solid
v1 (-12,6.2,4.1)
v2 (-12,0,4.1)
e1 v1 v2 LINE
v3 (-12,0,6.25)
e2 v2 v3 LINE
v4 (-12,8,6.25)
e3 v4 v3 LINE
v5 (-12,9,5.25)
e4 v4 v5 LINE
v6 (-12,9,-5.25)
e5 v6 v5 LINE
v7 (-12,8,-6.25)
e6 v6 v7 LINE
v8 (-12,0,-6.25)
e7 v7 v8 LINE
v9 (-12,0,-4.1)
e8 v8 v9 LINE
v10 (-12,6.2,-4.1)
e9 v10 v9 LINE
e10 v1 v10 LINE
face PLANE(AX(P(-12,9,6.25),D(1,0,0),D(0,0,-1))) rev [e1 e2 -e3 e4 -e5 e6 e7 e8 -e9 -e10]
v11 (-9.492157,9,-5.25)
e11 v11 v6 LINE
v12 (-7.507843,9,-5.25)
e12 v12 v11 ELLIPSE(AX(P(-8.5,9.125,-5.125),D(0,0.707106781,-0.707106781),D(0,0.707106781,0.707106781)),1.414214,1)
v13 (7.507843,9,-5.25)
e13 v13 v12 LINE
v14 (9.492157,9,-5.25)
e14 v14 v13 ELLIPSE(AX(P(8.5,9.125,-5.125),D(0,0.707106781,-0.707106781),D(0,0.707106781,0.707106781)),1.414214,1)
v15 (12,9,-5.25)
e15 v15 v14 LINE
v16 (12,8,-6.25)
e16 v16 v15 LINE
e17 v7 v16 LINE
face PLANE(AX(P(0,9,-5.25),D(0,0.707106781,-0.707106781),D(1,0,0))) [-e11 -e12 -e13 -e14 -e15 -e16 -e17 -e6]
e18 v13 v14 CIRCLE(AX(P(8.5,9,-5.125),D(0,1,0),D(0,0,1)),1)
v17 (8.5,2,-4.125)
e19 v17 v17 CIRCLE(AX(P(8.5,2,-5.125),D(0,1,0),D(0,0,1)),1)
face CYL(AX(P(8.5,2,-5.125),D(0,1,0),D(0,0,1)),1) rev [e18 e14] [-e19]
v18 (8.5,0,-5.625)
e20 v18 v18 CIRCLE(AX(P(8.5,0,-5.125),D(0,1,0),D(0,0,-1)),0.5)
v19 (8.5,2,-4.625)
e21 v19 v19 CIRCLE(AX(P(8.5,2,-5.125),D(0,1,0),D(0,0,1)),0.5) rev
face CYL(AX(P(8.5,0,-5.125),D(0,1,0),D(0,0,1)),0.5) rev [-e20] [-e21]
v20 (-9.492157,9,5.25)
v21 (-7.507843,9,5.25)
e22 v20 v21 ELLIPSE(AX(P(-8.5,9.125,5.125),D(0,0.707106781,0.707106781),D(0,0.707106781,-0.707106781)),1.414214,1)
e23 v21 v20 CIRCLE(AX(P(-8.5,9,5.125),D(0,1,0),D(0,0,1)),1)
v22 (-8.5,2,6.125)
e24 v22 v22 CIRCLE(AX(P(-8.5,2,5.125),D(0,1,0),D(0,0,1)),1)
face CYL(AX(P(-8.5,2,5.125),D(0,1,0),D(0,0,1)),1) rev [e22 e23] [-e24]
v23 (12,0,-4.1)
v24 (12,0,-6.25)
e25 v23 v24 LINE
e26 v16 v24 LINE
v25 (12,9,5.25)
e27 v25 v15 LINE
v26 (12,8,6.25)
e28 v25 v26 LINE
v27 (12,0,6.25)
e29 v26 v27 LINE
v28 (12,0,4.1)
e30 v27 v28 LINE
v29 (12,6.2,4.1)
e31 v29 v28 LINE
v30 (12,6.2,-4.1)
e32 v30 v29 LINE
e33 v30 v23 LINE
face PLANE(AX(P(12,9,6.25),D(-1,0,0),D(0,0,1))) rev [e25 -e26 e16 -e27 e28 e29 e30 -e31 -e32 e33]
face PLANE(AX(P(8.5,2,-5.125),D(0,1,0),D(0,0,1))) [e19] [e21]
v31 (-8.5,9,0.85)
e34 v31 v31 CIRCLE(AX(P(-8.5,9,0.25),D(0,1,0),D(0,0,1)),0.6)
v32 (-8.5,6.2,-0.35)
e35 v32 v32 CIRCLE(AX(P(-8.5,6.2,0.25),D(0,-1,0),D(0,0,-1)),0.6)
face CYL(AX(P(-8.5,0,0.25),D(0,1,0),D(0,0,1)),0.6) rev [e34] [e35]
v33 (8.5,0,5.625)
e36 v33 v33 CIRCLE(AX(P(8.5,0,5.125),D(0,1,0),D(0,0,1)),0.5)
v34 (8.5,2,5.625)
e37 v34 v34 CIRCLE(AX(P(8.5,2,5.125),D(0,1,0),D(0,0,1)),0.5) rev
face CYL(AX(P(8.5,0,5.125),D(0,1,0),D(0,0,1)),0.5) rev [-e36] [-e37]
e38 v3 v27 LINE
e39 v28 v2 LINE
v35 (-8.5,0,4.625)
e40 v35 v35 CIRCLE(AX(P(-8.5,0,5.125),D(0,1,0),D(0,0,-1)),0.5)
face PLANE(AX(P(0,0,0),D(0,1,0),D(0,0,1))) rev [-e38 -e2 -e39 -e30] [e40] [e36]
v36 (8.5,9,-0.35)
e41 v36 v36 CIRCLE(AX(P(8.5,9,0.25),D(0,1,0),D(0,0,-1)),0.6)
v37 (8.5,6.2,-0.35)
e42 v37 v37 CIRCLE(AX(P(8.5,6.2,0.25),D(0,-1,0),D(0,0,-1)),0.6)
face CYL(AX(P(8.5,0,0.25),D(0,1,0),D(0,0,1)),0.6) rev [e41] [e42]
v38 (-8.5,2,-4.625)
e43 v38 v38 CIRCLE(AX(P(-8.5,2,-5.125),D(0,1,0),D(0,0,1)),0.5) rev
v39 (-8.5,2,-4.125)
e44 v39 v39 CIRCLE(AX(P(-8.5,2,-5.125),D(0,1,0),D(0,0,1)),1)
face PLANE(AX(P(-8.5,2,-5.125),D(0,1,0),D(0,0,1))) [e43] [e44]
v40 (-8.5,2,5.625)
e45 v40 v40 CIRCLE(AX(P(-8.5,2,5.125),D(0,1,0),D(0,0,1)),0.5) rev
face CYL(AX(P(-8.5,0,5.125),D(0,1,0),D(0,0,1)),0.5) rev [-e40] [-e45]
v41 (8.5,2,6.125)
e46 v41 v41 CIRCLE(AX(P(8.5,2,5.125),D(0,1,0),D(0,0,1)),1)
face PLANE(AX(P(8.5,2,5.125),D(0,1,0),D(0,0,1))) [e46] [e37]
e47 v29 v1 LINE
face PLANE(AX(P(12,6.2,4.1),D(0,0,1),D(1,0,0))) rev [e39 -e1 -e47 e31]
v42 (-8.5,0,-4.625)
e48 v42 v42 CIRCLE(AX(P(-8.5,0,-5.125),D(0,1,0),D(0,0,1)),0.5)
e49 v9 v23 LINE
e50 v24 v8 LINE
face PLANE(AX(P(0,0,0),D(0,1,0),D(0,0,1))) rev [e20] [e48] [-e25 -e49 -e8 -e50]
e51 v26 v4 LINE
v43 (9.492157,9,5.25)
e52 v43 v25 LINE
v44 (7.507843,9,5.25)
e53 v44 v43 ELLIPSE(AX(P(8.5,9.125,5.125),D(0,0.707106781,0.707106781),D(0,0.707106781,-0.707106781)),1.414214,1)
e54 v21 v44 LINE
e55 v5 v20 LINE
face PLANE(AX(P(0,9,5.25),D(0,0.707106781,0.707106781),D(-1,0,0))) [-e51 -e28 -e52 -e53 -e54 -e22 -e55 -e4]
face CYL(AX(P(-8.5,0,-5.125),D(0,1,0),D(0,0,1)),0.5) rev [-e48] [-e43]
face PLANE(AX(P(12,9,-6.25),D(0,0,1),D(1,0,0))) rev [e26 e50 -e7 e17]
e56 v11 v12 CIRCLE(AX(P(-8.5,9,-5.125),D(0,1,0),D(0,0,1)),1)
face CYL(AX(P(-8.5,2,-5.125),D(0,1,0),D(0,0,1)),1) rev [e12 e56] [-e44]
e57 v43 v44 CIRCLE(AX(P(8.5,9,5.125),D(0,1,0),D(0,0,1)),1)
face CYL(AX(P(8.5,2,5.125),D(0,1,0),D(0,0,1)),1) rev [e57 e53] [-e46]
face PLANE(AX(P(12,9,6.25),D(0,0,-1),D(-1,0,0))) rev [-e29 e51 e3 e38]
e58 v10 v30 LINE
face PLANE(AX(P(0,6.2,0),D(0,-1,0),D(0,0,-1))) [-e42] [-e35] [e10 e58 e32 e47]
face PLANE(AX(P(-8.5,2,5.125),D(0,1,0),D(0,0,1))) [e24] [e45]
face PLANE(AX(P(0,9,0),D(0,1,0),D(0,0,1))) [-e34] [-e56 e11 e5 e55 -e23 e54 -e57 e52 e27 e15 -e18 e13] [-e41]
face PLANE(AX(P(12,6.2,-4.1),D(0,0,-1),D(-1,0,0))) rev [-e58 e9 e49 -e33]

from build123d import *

# Parameters (mm, degrees)
SKETCH_1_W          = 24
SKETCH_1_H          = 12.5
EXTRUDE_1_DEPTH     = 9
SKETCH_2_W          = 24
SKETCH_2_H          = 8.2
CUT_EXTRUDE_1_DEPTH = 6.2
SKETCH_3_R          = 0.5
CUT_EXTRUDE_2_DEPTH = 17.25
SKETCH_4_R          = 0.6
CUT_EXTRUDE_3_DEPTH = 17.25
SKETCH_5_R          = 1
CUT_EXTRUDE_4_DEPTH = 7
CHAMFER_1_SIZE      = 1


with BuildPart() as part:
    # 草图1 → 凸台-拉伸1 (new body)
    with BuildSketch(Plane(origin=(0, 0, 0), x_dir=(1, 0, 0), z_dir=(0, 1, 0))):
        Rectangle(SKETCH_1_W, SKETCH_1_H)
    extrude(amount=EXTRUDE_1_DEPTH)

    # 草图2 → 切除-拉伸1 (cut)
    with BuildSketch(Plane.XZ):
        Rectangle(SKETCH_2_W, SKETCH_2_H)
    extrude(amount=-CUT_EXTRUDE_1_DEPTH, mode=Mode.SUBTRACT)

    # 草图3 → 切除-拉伸2 (cut, through all)
    with BuildSketch(Plane(origin=(0, 9, 0), x_dir=(1, 0, 0), z_dir=(0, 1, 0))):
        with Locations(Location((-8.5, 5.125, 0), (0, 0, 270))):
            Circle(SKETCH_3_R)
        with Locations(Location((8.5, 5.125, 0), (0, 0, 90))):
            Circle(SKETCH_3_R)
        with Locations(Location((8.5, -5.125, 0), (0, 0, 270))):
            Circle(SKETCH_3_R)
        with Locations(Location((-8.5, -5.125, 0), (0, 0, 90))):
            Circle(SKETCH_3_R)
    extrude(amount=-CUT_EXTRUDE_2_DEPTH, mode=Mode.SUBTRACT)

    # 草图4 → 切除-拉伸3 (cut, through all)
    with BuildSketch(Plane(origin=(0, 9, 0), x_dir=(1, 0, 0), z_dir=(0, 1, 0))):
        with Locations(Location((-8.5, -0.25, 0), (0, 0, 270))):
            Circle(SKETCH_4_R)
        with Locations(Location((8.5, -0.25, 0), (0, 0, 90))):
            Circle(SKETCH_4_R)
    extrude(amount=-CUT_EXTRUDE_3_DEPTH, mode=Mode.SUBTRACT)

    # 草图5 → 切除-拉伸4 (cut)
    with BuildSketch(Plane(origin=(0, 9, 0), x_dir=(1, 0, 0), z_dir=(0, 1, 0))):
        with Locations(Location((-8.5, 5.125, 0), (0, 0, 270))):
            Circle(SKETCH_5_R)
        with Locations(Location((8.5, 5.125, 0), (0, 0, 270))):
            Circle(SKETCH_5_R)
        with Locations(Location((-8.5, -5.125, 0), (0, 0, 270))):
            Circle(SKETCH_5_R)
        with Locations(Location((8.5, -5.125, 0), (0, 0, 270))):
            Circle(SKETCH_5_R)
    extrude(amount=-CUT_EXTRUDE_4_DEPTH, mode=Mode.SUBTRACT)

    # 倒角1
    # the kernel refuses this chamfer: 1 mm, written as the material it takes off along each edge
    with BuildSketch(Plane(origin=(-14.571682988, 9, -6.25), x_dir=(0, 0.027495876610585623, 0.9996219169112968), z_dir=(1, 0, 0))) as chamfer_1_piece_1:
        Polygon((CHAMFER_1_SIZE * 0.999621916911, CHAMFER_1_SIZE * 0.0274958766106), (-CHAMFER_1_SIZE * 0.0274958766106, CHAMFER_1_SIZE * 0.999621916911), (0, 0), align=None)
    extrude(amount=29.143365976, mode=Mode.SUBTRACT)
    with BuildSketch(Plane(origin=(14.571682988, 9, 6.25), x_dir=(0, -0.9996219169112968, 0.027495876610586487), z_dir=(-1, 0, 0))) as chamfer_1_piece_2:
        Polygon((CHAMFER_1_SIZE * 0.999621916911, -CHAMFER_1_SIZE * 0.0274958766106), (-CHAMFER_1_SIZE * 0.0274958766106, -CHAMFER_1_SIZE * 0.999621916911), (0, 0), align=None)
    extrude(amount=29.143365976, mode=Mode.SUBTRACT)


solid = part.part
